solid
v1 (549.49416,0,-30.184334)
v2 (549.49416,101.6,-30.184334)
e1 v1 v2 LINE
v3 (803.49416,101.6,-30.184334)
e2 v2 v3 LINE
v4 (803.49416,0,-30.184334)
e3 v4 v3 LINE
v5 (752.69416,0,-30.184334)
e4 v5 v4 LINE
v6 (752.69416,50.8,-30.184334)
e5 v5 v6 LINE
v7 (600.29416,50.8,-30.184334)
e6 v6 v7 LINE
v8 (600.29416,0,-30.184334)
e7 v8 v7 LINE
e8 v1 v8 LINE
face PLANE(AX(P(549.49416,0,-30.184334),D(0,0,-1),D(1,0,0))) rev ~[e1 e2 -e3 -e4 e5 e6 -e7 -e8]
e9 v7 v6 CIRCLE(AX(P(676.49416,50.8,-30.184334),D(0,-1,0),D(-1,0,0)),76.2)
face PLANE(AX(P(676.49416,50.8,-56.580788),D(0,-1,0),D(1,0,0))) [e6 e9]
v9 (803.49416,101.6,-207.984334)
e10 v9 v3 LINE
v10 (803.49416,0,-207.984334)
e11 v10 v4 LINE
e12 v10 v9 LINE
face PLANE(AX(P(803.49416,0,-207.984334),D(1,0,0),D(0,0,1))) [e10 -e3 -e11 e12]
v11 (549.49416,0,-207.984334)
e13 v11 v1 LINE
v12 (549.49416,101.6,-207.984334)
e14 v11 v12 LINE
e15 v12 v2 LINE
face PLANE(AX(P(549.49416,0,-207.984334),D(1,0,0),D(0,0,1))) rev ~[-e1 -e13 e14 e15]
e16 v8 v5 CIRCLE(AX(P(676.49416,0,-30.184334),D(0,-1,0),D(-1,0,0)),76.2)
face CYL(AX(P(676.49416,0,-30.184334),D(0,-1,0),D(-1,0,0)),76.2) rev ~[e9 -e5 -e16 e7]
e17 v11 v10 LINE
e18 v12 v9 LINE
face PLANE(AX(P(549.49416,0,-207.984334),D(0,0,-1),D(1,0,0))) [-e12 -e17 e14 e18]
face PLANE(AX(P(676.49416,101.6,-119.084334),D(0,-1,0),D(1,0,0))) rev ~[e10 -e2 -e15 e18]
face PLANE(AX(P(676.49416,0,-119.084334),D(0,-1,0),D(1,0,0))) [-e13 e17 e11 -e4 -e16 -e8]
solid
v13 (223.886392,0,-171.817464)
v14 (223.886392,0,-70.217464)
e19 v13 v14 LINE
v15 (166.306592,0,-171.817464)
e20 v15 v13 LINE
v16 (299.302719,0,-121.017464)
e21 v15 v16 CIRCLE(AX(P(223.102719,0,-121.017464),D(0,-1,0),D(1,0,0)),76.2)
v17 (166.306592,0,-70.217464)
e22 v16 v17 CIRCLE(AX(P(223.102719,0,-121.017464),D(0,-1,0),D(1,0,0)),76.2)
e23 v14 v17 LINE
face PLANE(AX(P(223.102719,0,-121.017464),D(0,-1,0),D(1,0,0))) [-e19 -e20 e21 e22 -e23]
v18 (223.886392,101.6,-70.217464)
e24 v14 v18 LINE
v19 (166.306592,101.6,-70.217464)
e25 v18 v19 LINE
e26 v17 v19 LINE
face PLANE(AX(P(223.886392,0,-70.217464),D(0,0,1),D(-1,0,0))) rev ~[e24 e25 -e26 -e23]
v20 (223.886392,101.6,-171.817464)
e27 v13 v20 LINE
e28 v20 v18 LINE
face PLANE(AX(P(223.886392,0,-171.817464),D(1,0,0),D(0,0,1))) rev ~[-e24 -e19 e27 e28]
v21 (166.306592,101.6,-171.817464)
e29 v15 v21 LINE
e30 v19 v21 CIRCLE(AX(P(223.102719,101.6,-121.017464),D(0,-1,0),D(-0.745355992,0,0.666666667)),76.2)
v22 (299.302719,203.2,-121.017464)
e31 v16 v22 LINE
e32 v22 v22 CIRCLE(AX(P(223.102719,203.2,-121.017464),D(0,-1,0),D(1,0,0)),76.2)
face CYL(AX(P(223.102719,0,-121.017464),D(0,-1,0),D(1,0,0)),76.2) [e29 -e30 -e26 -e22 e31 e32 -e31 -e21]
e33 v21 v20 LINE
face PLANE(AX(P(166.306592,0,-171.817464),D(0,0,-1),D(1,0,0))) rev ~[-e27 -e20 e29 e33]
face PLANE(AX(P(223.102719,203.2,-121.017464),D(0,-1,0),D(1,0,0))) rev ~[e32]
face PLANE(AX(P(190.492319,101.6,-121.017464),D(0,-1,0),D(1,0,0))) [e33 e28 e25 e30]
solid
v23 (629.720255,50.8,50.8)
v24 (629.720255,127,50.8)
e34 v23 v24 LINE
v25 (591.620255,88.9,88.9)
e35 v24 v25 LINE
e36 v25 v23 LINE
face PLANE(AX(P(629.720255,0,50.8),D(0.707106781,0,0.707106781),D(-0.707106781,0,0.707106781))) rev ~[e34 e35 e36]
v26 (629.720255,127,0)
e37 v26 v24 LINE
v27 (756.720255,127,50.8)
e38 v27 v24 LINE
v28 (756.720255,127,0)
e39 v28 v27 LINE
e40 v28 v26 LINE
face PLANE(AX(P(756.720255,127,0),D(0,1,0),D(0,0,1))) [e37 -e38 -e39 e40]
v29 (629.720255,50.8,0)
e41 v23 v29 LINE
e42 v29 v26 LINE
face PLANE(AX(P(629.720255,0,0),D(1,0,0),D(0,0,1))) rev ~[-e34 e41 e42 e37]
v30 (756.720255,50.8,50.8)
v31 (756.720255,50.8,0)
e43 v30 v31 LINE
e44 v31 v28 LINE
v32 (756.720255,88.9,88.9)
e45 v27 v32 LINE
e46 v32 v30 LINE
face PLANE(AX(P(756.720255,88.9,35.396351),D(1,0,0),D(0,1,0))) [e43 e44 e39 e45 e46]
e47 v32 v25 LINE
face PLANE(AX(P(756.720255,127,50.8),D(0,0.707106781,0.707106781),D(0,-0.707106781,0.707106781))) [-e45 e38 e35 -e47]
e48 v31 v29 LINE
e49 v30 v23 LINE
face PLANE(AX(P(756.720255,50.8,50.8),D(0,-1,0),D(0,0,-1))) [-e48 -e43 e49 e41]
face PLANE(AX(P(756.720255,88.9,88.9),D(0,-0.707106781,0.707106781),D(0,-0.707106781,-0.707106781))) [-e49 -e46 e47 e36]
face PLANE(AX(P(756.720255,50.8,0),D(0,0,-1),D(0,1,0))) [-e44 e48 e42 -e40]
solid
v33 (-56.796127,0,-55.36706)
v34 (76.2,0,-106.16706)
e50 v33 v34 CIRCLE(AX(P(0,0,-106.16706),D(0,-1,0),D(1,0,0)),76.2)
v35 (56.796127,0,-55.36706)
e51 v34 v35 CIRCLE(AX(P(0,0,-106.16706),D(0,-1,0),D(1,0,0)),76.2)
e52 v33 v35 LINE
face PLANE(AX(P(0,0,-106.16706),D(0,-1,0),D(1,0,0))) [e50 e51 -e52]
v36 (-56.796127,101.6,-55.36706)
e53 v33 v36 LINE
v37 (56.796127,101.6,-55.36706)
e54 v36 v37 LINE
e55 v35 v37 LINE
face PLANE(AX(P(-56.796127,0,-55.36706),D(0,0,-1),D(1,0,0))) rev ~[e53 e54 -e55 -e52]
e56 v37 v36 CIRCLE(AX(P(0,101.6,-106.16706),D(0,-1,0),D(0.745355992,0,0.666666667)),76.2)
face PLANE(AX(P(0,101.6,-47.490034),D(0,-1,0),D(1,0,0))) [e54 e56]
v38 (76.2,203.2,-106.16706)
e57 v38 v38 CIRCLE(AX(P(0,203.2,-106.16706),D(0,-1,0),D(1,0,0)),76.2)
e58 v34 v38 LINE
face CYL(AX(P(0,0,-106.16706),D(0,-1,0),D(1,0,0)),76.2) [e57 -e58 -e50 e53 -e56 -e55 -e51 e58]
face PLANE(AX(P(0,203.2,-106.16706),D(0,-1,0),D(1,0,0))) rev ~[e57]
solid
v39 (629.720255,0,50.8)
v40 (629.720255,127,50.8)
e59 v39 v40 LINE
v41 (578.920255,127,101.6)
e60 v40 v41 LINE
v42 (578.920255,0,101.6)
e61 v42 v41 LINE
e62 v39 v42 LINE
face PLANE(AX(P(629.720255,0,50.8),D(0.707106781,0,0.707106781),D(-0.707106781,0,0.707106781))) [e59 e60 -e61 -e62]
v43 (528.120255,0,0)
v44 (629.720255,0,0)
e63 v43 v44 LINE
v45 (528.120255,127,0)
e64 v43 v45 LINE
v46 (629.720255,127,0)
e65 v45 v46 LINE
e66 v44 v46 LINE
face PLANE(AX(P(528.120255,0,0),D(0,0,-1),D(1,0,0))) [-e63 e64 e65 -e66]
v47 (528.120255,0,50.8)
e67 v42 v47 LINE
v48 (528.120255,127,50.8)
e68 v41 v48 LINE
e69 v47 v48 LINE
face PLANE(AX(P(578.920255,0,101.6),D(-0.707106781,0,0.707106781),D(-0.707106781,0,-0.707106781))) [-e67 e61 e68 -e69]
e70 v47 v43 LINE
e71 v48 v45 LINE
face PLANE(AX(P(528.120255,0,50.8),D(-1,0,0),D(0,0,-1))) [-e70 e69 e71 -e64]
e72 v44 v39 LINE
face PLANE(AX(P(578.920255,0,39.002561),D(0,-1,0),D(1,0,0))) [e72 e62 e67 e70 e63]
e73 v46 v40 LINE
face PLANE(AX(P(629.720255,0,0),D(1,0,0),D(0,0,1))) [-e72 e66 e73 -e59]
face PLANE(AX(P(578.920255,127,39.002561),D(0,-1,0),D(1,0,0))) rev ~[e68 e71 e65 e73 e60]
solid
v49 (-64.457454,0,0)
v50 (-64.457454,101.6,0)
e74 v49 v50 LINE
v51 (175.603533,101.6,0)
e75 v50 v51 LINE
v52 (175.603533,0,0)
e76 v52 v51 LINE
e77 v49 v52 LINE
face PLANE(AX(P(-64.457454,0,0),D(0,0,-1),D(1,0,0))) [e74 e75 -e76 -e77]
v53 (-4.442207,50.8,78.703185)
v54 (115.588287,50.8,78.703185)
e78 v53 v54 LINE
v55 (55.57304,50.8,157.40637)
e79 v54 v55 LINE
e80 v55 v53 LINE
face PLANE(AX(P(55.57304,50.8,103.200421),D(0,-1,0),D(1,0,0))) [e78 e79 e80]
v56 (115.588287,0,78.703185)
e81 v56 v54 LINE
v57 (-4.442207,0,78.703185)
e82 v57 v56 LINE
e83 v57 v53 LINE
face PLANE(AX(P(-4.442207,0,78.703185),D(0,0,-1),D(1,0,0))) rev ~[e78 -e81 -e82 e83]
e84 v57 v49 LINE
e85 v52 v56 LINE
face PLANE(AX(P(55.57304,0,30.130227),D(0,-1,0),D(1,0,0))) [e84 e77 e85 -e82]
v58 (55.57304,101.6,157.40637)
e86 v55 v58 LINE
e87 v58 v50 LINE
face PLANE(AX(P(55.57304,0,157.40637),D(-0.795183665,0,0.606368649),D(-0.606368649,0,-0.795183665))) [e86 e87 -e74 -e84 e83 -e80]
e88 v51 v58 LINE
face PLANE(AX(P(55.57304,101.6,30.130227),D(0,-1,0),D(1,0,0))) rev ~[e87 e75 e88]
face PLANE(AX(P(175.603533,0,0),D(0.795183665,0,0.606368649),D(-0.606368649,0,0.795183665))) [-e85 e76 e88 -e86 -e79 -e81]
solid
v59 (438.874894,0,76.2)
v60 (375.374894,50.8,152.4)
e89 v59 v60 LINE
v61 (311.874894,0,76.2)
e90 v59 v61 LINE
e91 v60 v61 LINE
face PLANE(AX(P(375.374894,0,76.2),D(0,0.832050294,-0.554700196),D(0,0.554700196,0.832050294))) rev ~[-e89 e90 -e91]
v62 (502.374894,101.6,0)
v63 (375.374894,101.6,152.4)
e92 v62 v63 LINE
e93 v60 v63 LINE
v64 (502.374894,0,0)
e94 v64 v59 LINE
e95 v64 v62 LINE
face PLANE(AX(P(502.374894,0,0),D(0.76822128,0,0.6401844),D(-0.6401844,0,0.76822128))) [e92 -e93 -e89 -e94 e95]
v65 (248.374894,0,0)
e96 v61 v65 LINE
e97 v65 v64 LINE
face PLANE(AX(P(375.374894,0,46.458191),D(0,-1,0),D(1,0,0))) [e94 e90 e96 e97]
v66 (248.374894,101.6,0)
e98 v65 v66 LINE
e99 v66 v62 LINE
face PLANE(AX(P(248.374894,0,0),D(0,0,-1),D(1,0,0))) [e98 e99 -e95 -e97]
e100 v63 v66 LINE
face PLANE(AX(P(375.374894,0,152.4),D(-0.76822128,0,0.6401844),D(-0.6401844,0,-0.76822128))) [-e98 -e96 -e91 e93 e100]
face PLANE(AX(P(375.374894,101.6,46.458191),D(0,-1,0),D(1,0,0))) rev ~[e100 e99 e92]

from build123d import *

# Parameters (mm, degrees)
F1_DEPTH  = 101.6
F3_DEPTH  = 50.8
F5_DEPTH  = 101.6
F10_DEPTH = 76.2
F12_DEPTH = 127
F16_R     = 76.2
F17_DEPTH = 203.2
F19_DEPTH = 101.6
F20_R     = 76.2
F21_DEPTH = 203.2
F23_DEPTH = 101.6
F24_W     = 254
F24_H     = 177.8
F25_DEPTH = 101.6
F27_DEPTH = 50.8


with BuildPart() as f1:
    # F0 (on Front) → F1 (new body)
    with BuildSketch(Plane.XZ):
        Polygon((-6.3510152444, 76.2), (-64.4574540923, 0), (175.6035333722, 0), (117.4970945244, 76.2), align=None)
        Polygon((55.57303964, 157.4063701674), (-6.3510152444, 76.2), (117.4970945244, 76.2), align=None)
    extrude(amount=-F1_DEPTH)

    # F2 (on face) → F3 (cut)
    with BuildSketch(Plane.XZ):
        Polygon((-4.4422072262, 78.7031850837), (115.5882865061, 78.7031850837), (55.57303964, 157.4063701674), align=None)
    extrude(amount=-F3_DEPTH, mode=Mode.SUBTRACT)


with BuildPart() as f5:
    # F4 (on Front) → F5 (new body)
    with BuildSketch(Plane.XZ):
        Polygon((248.3748940486, 0), (502.3748940486, 0), (375.3748940486, 152.4), align=None)
    extrude(amount=-F5_DEPTH)

    # F9 (on 3pt) → F10 (cut, symmetric)
    with BuildSketch(Plane.YZ.offset(375.3748940486)):
        Polygon((50.8, 152.4), (0, 152.4), (0, 76.2), align=None)
    extrude(amount=F10_DEPTH, both=True, mode=Mode.SUBTRACT)


with BuildPart() as f12:
    # F11 (on Front) → F12 (new body)
    with BuildSketch(Plane.XZ):
        Polygon((578.9202551112, 101.6), (528.1202551112, 50.8), (528.1202551112, 0), (629.7202551112, 0), (629.7202551112, 50.8), align=None)
    extrude(amount=-F12_DEPTH)


with BuildPart() as f15:
    # F14 (on offset) → F15 (new body, up to the next surface of F12)
    with BuildSketch(Plane.YZ.offset(756.7202551112)):
        Polygon((50.8, 0), (127, 0), (127, 50.8), (88.9, 88.9), (50.8, 50.8), align=None)
    extrude(until=Until.NEXT, target=f12.part, dir=(-1, 0, 0))


with BuildPart() as f17:
    # F16 (on Front) → F17 (new body)
    with BuildSketch(Plane.XZ):
        with Locations((0, -106.1670597964)):
            Circle(F16_R)
    extrude(amount=-F17_DEPTH)

    # F18 (on face) → F19 (cut)
    with BuildSketch(Plane.XZ):
        with BuildLine():
            ThreePointArc((56.7961266285, -55.3670597964), (0, -29.9670597964), (-56.7961266285, -55.3670597964))
            Line((-56.7961266285, -55.3670597964), (56.7961266285, -55.3670597964))
        make_face()
    extrude(amount=-F19_DEPTH, mode=Mode.SUBTRACT)


with BuildPart() as f21:
    # F20 (on Front) → F21 (new body)
    with BuildSketch(Plane.XZ):
        with Locations((223.1027185917, -121.0174635053)):
            Circle(F20_R)
    extrude(amount=-F21_DEPTH)

    # F22 (on face) → F23 (cut)
    with BuildSketch(Plane.XZ):
        with BuildLine():
            Line((223.886392215, -70.2174635053), (166.3065919632, -70.2174635053))
            ThreePointArc((166.3065919632, -70.2174635053), (146.9027185917, -121.0174635053), (166.3065919632, -171.8174635053))
            Line((166.3065919632, -171.8174635053), (223.886392215, -171.8174635053))
            Line((223.886392215, -171.8174635053), (223.886392215, -70.2174635053))
        make_face()
    extrude(amount=-F23_DEPTH, mode=Mode.SUBTRACT)


with BuildPart() as f25:
    # F24 (on Front) → F25 (new body)
    with BuildSketch(Plane.XZ):
        with Locations((676.4941598731, -119.0843340009)):
            Rectangle(F24_W, F24_H)
    extrude(amount=-F25_DEPTH)

    # F26 (on face) → F27 (cut)
    with BuildSketch(Plane.XZ):
        with BuildLine():
            ThreePointArc((600.2941598731, -30.1843340009), (676.4941598731, -106.3843340009), (752.6941598731, -30.1843340009))
            Line((752.6941598731, -30.1843340009), (600.2941598731, -30.1843340009))
        make_face()
    extrude(amount=-F27_DEPTH, mode=Mode.SUBTRACT)


solid = Compound([f1.part, f5.part, f12.part, f15.part, f17.part, f21.part, f25.part])
